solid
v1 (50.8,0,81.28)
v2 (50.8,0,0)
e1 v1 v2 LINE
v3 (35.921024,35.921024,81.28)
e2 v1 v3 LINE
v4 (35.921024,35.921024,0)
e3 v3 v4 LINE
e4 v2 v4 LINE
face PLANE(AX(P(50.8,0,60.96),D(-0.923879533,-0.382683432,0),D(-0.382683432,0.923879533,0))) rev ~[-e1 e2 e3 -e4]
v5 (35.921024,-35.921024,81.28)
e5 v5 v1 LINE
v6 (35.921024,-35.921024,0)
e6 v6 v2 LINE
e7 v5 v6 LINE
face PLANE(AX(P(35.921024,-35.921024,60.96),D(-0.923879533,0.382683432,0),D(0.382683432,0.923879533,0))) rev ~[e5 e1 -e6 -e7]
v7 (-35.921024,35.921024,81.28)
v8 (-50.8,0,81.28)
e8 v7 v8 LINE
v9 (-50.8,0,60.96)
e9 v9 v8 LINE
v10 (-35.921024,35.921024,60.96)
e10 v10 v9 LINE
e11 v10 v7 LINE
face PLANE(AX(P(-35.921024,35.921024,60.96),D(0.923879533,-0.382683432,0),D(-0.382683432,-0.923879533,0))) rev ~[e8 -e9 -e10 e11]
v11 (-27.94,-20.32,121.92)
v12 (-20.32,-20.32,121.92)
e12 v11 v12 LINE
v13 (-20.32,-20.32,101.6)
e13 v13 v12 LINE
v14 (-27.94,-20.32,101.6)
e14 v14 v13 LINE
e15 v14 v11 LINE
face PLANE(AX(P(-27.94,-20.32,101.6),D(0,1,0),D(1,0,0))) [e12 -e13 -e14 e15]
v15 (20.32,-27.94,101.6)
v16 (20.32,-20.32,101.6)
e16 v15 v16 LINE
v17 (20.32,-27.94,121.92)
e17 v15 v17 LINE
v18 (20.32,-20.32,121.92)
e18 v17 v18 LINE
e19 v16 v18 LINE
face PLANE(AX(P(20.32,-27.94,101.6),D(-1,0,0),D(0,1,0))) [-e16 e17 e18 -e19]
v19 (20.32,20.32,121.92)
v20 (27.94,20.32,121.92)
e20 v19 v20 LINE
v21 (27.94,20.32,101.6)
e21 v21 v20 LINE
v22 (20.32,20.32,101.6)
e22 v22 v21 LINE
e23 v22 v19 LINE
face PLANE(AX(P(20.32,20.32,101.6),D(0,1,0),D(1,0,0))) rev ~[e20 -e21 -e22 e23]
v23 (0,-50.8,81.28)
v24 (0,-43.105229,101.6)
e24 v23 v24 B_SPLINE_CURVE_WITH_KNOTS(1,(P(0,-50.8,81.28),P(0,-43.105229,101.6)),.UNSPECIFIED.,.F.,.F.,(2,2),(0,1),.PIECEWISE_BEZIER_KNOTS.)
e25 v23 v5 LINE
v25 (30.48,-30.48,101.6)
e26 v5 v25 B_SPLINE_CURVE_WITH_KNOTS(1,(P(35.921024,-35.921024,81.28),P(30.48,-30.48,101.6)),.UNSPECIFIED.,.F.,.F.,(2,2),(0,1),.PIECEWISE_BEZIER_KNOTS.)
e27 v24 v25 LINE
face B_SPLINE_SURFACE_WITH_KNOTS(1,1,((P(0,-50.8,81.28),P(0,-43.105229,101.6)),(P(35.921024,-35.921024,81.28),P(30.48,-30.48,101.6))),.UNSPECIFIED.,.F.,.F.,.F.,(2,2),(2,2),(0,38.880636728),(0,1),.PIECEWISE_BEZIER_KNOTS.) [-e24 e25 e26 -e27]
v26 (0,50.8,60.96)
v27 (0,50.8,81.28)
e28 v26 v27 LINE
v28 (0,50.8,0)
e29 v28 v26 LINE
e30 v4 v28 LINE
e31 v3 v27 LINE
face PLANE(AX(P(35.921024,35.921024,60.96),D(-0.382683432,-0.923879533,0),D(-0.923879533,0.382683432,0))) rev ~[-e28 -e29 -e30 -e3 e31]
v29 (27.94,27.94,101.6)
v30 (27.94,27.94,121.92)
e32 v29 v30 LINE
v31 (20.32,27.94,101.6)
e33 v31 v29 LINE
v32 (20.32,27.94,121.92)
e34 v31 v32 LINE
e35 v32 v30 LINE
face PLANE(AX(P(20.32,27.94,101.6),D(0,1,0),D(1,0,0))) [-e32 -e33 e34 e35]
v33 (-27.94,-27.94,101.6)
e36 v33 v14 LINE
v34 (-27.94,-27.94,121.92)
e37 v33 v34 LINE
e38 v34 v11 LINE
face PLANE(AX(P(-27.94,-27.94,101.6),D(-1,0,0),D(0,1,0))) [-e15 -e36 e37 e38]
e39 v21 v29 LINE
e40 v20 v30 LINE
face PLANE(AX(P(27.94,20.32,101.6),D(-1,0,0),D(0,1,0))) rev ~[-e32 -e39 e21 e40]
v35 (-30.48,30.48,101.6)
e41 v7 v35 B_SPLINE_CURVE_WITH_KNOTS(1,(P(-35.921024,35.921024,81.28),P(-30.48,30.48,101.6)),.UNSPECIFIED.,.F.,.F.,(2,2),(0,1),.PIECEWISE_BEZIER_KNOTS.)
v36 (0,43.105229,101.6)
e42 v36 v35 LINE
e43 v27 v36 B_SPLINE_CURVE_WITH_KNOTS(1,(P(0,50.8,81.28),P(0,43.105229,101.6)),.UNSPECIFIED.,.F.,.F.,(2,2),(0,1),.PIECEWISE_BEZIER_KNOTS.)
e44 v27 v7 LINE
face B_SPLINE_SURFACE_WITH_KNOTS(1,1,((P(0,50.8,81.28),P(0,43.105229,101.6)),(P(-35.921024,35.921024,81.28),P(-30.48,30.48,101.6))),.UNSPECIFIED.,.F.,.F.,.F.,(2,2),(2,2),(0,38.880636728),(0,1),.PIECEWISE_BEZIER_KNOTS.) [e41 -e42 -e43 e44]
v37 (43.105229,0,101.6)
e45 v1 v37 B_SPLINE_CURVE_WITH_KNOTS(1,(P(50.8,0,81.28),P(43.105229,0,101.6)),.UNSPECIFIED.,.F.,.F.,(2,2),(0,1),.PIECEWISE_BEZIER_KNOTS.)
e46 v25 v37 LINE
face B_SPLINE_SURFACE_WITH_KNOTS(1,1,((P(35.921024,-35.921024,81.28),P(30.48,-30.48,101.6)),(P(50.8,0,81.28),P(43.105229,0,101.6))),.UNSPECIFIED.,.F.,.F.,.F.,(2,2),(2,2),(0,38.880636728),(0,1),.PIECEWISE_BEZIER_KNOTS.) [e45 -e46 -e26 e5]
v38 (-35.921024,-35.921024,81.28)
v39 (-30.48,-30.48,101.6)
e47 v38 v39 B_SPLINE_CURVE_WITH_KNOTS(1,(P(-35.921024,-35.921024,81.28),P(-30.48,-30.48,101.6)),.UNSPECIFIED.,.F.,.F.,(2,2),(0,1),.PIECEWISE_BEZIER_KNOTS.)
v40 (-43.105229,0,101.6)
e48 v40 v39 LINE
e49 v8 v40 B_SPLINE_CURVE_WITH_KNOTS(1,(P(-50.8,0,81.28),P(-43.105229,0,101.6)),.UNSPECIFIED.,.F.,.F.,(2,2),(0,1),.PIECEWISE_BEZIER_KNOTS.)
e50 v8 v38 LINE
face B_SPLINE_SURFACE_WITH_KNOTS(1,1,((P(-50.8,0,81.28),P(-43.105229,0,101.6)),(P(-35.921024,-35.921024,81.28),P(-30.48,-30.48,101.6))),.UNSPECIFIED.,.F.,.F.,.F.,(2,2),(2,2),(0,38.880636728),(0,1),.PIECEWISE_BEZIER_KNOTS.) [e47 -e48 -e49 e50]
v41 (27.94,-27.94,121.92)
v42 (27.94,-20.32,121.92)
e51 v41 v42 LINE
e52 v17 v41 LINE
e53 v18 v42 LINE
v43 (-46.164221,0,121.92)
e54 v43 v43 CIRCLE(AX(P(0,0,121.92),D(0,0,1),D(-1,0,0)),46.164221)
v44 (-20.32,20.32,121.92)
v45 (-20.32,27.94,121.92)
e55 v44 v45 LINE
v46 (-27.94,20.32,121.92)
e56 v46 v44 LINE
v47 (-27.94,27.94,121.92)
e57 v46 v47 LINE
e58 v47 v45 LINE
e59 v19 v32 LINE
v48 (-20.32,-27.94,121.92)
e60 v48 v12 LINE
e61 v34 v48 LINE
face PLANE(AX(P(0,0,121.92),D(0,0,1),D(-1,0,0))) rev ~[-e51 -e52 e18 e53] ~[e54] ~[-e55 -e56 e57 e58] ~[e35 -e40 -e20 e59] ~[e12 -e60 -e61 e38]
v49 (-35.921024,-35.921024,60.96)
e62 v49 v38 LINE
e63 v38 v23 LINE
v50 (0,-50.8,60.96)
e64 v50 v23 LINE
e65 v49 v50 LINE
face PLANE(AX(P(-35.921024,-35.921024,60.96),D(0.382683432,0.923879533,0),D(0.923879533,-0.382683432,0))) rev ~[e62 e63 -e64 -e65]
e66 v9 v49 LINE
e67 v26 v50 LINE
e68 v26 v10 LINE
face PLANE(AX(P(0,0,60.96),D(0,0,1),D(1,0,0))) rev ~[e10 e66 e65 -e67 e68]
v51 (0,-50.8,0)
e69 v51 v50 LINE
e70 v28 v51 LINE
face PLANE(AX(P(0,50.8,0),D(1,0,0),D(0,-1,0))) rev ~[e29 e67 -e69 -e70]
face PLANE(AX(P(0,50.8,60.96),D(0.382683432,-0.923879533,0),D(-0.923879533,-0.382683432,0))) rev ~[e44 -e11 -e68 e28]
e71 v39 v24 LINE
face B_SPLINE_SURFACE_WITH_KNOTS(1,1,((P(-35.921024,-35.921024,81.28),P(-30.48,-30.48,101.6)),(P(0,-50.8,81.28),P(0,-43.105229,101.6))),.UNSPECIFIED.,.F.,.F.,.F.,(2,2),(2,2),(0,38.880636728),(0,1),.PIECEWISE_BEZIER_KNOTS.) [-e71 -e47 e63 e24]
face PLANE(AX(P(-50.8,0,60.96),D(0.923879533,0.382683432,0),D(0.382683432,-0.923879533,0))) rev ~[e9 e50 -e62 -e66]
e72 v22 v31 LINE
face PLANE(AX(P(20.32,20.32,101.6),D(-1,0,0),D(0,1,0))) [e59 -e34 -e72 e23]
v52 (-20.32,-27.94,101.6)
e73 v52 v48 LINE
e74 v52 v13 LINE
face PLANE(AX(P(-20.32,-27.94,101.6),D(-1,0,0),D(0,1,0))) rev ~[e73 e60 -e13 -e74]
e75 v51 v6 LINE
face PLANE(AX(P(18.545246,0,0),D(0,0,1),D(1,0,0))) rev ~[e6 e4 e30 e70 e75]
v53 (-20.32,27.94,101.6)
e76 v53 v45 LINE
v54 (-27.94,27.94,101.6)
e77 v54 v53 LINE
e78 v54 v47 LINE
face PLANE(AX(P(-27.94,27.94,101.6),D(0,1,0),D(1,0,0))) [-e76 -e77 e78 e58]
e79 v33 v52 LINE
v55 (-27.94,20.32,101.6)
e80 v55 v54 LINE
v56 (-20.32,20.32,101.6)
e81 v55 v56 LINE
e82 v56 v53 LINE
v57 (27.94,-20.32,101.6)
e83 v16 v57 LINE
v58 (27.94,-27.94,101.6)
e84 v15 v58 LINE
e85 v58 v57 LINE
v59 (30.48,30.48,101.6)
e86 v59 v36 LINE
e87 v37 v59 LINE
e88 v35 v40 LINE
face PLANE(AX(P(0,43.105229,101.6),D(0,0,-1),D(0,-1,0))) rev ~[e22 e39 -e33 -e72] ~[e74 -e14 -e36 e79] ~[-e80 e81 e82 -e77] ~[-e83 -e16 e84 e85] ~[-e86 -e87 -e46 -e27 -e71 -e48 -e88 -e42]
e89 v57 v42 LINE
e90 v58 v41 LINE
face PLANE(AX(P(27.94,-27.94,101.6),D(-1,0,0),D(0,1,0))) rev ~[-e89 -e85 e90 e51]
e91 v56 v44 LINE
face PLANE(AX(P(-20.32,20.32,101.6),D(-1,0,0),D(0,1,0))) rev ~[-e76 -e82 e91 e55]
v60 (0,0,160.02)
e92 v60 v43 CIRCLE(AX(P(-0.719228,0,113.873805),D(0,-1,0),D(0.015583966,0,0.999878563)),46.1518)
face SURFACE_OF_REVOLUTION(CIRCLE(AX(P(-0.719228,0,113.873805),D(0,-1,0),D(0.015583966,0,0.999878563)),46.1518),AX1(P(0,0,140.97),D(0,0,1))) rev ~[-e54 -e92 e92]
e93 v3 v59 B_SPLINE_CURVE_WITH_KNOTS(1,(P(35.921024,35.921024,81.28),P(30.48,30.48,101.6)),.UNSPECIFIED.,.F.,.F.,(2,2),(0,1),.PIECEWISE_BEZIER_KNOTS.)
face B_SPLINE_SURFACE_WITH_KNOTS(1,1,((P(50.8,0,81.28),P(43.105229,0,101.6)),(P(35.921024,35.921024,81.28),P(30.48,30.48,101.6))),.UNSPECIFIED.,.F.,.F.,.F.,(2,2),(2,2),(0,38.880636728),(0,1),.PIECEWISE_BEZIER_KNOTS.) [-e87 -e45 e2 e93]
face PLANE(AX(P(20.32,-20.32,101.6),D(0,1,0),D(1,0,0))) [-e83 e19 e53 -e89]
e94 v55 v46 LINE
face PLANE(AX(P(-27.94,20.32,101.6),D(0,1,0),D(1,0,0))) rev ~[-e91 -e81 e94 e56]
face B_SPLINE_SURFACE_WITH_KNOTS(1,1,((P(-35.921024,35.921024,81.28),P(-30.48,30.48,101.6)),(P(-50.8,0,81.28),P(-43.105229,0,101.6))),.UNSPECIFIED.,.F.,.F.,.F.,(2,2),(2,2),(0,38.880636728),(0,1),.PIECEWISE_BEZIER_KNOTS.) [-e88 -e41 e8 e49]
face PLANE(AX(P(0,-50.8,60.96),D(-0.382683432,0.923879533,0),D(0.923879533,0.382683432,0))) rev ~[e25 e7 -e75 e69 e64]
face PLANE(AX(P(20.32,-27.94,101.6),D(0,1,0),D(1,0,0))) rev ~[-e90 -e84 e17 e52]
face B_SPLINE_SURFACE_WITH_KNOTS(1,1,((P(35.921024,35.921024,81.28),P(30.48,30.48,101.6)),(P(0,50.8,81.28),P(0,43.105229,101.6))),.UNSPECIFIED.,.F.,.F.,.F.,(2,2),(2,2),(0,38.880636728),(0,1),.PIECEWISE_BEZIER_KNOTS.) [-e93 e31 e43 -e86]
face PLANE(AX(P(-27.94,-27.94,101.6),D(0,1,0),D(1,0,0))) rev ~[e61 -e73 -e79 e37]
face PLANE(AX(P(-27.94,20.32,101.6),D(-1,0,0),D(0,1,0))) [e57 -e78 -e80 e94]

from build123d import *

# Parameters (mm, degrees)
F2_DEPTH  = 60.96
F4_DEPTH  = 20.32
F9_W      = 7.62
F9_H      = 7.62
F14_DEPTH = 20.32


with BuildPart() as f2:
    # F0 (on Top) → F2 (new body)
    with BuildSketch(Plane.XY):
        Polygon((35.9210244843, 35.9210244843), (0, 50.8), (0, -50.8), (35.9210244843, -35.9210244843), (50.8, 0), align=None)
    extrude(amount=F2_DEPTH)

    # F3 (on offset) → F4 (join)
    with BuildSketch(Plane.XY.offset(60.96)):
        Polygon((35.9210244843, 35.9210244843), (0, 50.8), (-35.9210244843, 35.9210244843), (-50.8, 0), (-35.9210244843, -35.9210244843), (0, -50.8), (35.9210244843, -35.9210244843), (50.8, 0), align=None)
    extrude(amount=F4_DEPTH)

    # F7 (on offset) → F13 section 0
    with BuildSketch(Plane.XY.offset(81.28)):
        Polygon((0, 50.8), (-35.9210244843, 35.9210244843), (-50.8, 0), (-35.9210244843, -35.9210244843), (0, -50.8), (35.9210244843, -35.9210244843), (50.8, 0), (35.9210244843, 35.9210244843), align=None)
    # F8 (on offset) → F13 section 1
    with BuildSketch(Plane.XY.offset(101.6)):
        Polygon((43.1052293811, 0), (30.48, 30.48), (0, 43.1052293811), (-30.48, 30.48), (-43.1052293811, 0), (-30.48, -30.48), (0, -43.1052293811), (30.48, -30.48), align=None)
    loft()

    # F9 (on offset) → F14 (join)
    with BuildSketch(Plane.XY.offset(101.6)):
        with Locations((-24.13, 24.13)):
            Rectangle(F9_W, F9_H)
        with Locations((24.13, 24.13)):
            Rectangle(F9_W, F9_H)
        with Locations((-24.13, -24.13)):
            Rectangle(F9_W, F9_H)
        with Locations((24.13, -24.13)):
            Rectangle(F9_W, F9_H)
    extrude(amount=F14_DEPTH)

    # F15 (on Front) → F16 (revolve)
    with BuildSketch(Plane.XZ):
        with BuildLine():
            ThreePointArc((0, 160.02), (-30.0961069105, 149.4685742909), (-46.1642209939, 121.92))
            Line((-46.1642209939, 121.92), (0, 121.92))
            Line((0, 121.92), (0, 160.02))
        make_face()
    revolve(axis=Axis((0, 0, 140.97), (0, 0, 1)))


solid = f2.part
